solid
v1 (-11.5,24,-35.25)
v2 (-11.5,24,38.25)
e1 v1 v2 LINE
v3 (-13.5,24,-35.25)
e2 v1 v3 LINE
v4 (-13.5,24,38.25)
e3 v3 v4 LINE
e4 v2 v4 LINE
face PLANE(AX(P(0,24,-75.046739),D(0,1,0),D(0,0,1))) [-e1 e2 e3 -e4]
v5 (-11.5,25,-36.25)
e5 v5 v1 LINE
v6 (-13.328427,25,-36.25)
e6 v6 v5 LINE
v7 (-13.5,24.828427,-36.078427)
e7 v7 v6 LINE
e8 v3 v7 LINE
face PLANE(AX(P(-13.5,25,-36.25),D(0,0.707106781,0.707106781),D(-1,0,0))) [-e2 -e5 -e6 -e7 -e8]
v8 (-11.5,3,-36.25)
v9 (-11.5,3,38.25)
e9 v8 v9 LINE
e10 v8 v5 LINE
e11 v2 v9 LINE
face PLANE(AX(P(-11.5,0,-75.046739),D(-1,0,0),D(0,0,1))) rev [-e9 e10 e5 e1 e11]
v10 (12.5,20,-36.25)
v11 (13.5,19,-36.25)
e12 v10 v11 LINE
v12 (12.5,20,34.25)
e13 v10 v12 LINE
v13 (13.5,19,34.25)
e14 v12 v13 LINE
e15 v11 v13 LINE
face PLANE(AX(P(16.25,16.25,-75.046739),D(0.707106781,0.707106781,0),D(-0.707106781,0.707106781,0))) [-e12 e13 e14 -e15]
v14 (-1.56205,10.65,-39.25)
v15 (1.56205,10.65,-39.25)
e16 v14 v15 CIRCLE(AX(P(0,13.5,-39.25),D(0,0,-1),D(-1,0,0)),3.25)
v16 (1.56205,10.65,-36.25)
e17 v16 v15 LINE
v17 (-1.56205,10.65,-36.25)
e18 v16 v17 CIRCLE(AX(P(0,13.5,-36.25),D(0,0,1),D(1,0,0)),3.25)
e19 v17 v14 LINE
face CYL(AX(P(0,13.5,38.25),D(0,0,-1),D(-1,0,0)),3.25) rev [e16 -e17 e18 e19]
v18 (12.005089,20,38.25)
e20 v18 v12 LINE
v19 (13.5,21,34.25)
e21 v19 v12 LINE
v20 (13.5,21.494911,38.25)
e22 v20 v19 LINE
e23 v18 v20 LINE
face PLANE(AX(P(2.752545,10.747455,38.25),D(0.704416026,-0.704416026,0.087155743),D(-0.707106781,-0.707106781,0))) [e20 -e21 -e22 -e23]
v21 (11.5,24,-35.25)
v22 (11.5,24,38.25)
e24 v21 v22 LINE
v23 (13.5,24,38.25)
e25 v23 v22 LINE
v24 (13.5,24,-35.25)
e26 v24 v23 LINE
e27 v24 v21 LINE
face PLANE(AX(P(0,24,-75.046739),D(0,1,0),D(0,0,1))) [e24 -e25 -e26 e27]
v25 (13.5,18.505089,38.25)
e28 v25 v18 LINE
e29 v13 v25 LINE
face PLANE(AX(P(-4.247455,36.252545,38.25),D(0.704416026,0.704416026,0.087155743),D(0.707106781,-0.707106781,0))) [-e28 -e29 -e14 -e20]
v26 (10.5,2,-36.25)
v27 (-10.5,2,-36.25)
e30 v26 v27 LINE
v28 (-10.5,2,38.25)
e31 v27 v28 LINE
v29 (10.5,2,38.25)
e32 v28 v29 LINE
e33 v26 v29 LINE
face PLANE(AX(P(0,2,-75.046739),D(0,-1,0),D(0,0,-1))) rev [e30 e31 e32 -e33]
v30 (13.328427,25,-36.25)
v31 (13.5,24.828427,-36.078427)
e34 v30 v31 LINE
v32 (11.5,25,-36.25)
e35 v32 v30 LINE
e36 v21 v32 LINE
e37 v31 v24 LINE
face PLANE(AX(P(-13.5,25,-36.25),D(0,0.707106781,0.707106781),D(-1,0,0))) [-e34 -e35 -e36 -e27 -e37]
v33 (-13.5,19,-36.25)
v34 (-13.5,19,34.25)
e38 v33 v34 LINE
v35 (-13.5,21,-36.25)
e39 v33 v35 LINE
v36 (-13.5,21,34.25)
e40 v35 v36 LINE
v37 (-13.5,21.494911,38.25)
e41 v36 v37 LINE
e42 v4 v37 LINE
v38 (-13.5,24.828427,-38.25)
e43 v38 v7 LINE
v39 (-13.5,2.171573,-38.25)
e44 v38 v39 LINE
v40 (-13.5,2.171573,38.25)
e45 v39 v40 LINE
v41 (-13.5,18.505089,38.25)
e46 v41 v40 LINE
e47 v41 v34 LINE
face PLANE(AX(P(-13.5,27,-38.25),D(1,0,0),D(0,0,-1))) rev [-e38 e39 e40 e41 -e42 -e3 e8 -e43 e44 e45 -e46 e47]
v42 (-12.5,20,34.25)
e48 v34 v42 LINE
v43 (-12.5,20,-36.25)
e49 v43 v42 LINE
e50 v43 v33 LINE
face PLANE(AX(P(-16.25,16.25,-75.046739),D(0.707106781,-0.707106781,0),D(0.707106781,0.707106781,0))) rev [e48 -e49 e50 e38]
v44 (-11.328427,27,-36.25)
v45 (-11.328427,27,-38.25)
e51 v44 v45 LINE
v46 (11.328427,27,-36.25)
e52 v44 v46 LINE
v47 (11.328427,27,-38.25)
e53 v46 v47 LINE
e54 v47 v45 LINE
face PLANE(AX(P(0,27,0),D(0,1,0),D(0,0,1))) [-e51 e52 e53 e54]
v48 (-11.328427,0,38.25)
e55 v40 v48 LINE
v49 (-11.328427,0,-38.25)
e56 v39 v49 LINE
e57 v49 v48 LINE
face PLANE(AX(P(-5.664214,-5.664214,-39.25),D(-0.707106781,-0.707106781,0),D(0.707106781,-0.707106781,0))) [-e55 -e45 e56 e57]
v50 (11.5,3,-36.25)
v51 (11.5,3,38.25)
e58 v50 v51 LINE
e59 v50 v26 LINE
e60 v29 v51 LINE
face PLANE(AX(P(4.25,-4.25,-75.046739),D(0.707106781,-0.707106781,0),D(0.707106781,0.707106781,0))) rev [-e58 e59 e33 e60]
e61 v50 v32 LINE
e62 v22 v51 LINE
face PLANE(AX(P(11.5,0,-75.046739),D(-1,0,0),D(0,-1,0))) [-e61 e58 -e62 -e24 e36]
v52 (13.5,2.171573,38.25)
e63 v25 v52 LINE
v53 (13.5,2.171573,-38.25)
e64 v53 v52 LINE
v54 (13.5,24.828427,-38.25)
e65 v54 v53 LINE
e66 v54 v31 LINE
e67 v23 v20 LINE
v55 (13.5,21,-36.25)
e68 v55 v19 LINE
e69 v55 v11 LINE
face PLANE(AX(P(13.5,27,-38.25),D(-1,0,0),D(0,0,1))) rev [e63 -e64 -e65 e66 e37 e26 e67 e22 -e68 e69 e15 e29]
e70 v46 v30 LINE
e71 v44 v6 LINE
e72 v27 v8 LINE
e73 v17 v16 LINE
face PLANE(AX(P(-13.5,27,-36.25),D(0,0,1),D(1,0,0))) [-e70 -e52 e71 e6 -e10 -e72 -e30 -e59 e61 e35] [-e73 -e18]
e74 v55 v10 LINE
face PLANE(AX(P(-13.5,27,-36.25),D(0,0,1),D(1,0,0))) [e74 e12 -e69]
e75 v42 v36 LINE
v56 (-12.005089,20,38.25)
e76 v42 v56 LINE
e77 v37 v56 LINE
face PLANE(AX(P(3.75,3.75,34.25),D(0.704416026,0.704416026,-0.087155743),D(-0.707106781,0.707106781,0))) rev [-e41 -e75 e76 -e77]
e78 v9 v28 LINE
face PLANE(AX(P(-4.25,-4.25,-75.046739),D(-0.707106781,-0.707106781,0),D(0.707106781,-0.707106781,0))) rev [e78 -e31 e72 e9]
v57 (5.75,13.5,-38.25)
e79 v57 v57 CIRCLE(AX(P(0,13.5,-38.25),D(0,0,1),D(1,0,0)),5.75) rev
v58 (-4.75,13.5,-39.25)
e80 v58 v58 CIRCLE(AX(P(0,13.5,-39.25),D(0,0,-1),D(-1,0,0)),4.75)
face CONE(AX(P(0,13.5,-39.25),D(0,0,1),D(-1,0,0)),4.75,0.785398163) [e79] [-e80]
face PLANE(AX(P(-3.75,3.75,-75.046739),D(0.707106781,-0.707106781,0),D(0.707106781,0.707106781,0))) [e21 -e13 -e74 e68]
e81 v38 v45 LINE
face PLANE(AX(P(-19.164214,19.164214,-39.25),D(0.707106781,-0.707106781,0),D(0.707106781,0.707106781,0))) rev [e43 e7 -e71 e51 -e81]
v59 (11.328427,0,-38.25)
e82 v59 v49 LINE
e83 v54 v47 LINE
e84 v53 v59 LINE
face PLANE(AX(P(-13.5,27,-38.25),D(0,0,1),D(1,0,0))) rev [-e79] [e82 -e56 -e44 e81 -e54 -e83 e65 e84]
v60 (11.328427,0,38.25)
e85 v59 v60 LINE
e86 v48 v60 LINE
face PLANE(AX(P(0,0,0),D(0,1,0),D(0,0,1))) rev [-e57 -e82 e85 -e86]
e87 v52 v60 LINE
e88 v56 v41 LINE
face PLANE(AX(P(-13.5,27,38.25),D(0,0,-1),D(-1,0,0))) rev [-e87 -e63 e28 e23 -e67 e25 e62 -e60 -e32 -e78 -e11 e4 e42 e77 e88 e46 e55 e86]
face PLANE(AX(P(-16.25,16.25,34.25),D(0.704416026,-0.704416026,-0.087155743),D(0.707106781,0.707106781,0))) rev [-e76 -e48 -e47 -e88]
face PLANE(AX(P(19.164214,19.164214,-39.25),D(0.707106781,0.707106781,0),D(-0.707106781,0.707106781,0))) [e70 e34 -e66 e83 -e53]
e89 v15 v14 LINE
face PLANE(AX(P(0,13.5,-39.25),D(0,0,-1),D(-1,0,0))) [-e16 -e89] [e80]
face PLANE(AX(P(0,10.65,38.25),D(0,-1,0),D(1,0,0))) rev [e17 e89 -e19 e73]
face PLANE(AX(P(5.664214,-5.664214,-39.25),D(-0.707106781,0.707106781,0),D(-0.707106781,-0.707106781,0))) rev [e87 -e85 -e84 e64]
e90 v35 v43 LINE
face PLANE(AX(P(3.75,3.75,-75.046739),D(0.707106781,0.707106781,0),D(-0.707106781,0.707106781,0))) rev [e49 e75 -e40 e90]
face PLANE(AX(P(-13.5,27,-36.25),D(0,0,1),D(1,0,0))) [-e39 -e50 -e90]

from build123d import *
from OCP.BRepFilletAPI import BRepFilletAPI_MakeChamfer

# Parameters (mm, degrees)
SKETCH1_W           = 27
SKETCH1_H           = 76.5
BOSS_EXTRUDE1_DEPTH = 27
CUT_EXTRUDE3_DEPTH  = 84.171509545
CUT_EXTRUDE4_DEPTH  = 84.171509545
CUT_EXTRUDE5_DEPTH  = 74.5
CHAMFER1_SIZE       = 4
CHAMFER1_SIZE2      = 0.349954654
CHAMFER2_SIZE       = 4
CHAMFER2_SIZE2      = 0.349954654
CHAMFER3_SIZE       = 1


# Read off the part's stored shape, not the designer's step: Boss-Extrude2
with BuildPart() as part:
    # Sketch1 → Boss-Extrude1 (new body)
    with BuildSketch(Plane(origin=(0, 0, 0), x_dir=(1, 0, 0), z_dir=(0, 1, 0))):
        Rectangle(SKETCH1_W, SKETCH1_H)
    extrude(amount=BOSS_EXTRUDE1_DEPTH)

    # Boss-Extrude2 outline → Boss-Extrude2 (revolve)
    with BuildSketch(Plane.XZ.offset(-13.5)):
        Polygon((0, -38.25), (0, -39.25), (4.75, -39.25), (5.75, -38.25), align=None)
    revolve(axis=Axis((0, 13.5, 0), (0, 0, 1)))

    # Sketch6 → Cut-Extrude3 (cut, through all)
    with BuildSketch(Plane(origin=(0, 0, -39.25), x_dir=(-1, 0, 0), z_dir=(0, 0, -1))):
        with BuildLine():
            ThreePointArc((3.25, 13.5), (-1.656175974, 16.296351399), (-1.562049935, 10.65))
            Line((-1.562049935, 10.65), (1.562049935, 10.65))
            ThreePointArc((1.562049935, 10.65), (2.796351399, 11.843824026), (3.25, 13.5))
        make_face()
    extrude(amount=-CUT_EXTRUDE3_DEPTH, mode=Mode.SUBTRACT)

    # Sketch7 → Cut-Extrude4 (cut, through all)
    with BuildSketch(Plane.XY.offset(38.25)):
        Polygon((-11.328427125, 0), (-13.5, 2.171572875), (-13.5, 0), align=None)
        Polygon((-13.5, 27), (-13.5, 24.828427125), (-11.328427125, 27), align=None)
        Polygon((13.5, 27), (11.328427125, 27), (13.5, 24.828427125), align=None)
        Polygon((13.5, 2.171572875), (11.328427125, 0), (13.5, 0), align=None)
    extrude(amount=-CUT_EXTRUDE4_DEPTH, mode=Mode.SUBTRACT)

    # Sketch7<3> → Cut-Extrude5 (cut)
    with BuildSketch(Plane.XY.offset(38.25)):
        Polygon((-13.5, 2.171572875), (-11.328427125, 0), (-13.5, 0), align=None)
        Polygon((-11.5, 24), (-13.5, 24), (-13.5, 27), (13.5, 27), (13.5, 24), (11.5, 24), (11.5, 3), (10.5, 2), (-10.5, 2), (-11.5, 3), align=None)
        Polygon((11.328427125, 0), (13.5, 0), (13.5, 2.171572875), align=None)
        Polygon((-13.5, 21), (-13.5, 19), (-12.5, 20), align=None)
        Polygon((13.5, 19), (12.5, 20), (13.5, 21), align=None)
    extrude(amount=-CUT_EXTRUDE5_DEPTH, mode=Mode.SUBTRACT)

    # Chamfer1: one chamfer whose edges measure the first distance from different faces: ONE call of the kernel's chamfer builder (chamfer() names one face for all edges)
    chamfer1_edges_1 = [part.edges().sort_by_distance(p)[0] for p in [
        (-13, 19.5, 38.25),
    ]]
    chamfer1_side_1 = [part.faces().sort_by_distance(p)[0] for p in [
        (-13, 19.5, 1),
    ]]
    chamfer1_edges_2 = [part.edges().sort_by_distance(p)[0] for p in [
        (-13, 20.5, 38.25),
    ]]
    chamfer1_side_2 = [part.faces().sort_by_distance(p)[0] for p in [
        (-13, 20.5, 1),
    ]]
    chamfer1 = BRepFilletAPI_MakeChamfer(part.part.solid().wrapped)
    for e in chamfer1_edges_1:
        chamfer1.Add(CHAMFER1_SIZE, CHAMFER1_SIZE2, e.wrapped, chamfer1_side_1[0].wrapped)  # the first distance lies on this face
    for e in chamfer1_edges_2:
        chamfer1.Add(CHAMFER1_SIZE, CHAMFER1_SIZE2, e.wrapped, chamfer1_side_2[0].wrapped)  # the first distance lies on this face
    add(Compound.cast(chamfer1.Shape()), mode=Mode.REPLACE)

    # Chamfer2: one chamfer whose edges measure the first distance from different faces: ONE call of the kernel's chamfer builder (chamfer() names one face for all edges)
    chamfer2_edges_1 = [part.edges().sort_by_distance(p)[0] for p in [
        (13, 19.5, 38.25),
    ]]
    chamfer2_side_1 = [part.faces().sort_by_distance(p)[0] for p in [
        (13, 19.5, 1),
    ]]
    chamfer2_edges_2 = [part.edges().sort_by_distance(p)[0] for p in [
        (13, 20.5, 38.25),
    ]]
    chamfer2_side_2 = [part.faces().sort_by_distance(p)[0] for p in [
        (13, 20.5, 1),
    ]]
    chamfer2 = BRepFilletAPI_MakeChamfer(part.part.solid().wrapped)
    for e in chamfer2_edges_1:
        chamfer2.Add(CHAMFER2_SIZE, CHAMFER2_SIZE2, e.wrapped, chamfer2_side_1[0].wrapped)  # the first distance lies on this face
    for e in chamfer2_edges_2:
        chamfer2.Add(CHAMFER2_SIZE, CHAMFER2_SIZE2, e.wrapped, chamfer2_side_2[0].wrapped)  # the first distance lies on this face
    add(Compound.cast(chamfer2.Shape()), mode=Mode.REPLACE)

    # Chamfer3
    chamfer3_edges = [part.edges().sort_by_distance(p)[0] for p in [
        (12.5, 24, -36.25),
        (-12.5, 24, -36.25),
    ]]
    chamfer(chamfer3_edges, length=CHAMFER3_SIZE)


solid = part.part
